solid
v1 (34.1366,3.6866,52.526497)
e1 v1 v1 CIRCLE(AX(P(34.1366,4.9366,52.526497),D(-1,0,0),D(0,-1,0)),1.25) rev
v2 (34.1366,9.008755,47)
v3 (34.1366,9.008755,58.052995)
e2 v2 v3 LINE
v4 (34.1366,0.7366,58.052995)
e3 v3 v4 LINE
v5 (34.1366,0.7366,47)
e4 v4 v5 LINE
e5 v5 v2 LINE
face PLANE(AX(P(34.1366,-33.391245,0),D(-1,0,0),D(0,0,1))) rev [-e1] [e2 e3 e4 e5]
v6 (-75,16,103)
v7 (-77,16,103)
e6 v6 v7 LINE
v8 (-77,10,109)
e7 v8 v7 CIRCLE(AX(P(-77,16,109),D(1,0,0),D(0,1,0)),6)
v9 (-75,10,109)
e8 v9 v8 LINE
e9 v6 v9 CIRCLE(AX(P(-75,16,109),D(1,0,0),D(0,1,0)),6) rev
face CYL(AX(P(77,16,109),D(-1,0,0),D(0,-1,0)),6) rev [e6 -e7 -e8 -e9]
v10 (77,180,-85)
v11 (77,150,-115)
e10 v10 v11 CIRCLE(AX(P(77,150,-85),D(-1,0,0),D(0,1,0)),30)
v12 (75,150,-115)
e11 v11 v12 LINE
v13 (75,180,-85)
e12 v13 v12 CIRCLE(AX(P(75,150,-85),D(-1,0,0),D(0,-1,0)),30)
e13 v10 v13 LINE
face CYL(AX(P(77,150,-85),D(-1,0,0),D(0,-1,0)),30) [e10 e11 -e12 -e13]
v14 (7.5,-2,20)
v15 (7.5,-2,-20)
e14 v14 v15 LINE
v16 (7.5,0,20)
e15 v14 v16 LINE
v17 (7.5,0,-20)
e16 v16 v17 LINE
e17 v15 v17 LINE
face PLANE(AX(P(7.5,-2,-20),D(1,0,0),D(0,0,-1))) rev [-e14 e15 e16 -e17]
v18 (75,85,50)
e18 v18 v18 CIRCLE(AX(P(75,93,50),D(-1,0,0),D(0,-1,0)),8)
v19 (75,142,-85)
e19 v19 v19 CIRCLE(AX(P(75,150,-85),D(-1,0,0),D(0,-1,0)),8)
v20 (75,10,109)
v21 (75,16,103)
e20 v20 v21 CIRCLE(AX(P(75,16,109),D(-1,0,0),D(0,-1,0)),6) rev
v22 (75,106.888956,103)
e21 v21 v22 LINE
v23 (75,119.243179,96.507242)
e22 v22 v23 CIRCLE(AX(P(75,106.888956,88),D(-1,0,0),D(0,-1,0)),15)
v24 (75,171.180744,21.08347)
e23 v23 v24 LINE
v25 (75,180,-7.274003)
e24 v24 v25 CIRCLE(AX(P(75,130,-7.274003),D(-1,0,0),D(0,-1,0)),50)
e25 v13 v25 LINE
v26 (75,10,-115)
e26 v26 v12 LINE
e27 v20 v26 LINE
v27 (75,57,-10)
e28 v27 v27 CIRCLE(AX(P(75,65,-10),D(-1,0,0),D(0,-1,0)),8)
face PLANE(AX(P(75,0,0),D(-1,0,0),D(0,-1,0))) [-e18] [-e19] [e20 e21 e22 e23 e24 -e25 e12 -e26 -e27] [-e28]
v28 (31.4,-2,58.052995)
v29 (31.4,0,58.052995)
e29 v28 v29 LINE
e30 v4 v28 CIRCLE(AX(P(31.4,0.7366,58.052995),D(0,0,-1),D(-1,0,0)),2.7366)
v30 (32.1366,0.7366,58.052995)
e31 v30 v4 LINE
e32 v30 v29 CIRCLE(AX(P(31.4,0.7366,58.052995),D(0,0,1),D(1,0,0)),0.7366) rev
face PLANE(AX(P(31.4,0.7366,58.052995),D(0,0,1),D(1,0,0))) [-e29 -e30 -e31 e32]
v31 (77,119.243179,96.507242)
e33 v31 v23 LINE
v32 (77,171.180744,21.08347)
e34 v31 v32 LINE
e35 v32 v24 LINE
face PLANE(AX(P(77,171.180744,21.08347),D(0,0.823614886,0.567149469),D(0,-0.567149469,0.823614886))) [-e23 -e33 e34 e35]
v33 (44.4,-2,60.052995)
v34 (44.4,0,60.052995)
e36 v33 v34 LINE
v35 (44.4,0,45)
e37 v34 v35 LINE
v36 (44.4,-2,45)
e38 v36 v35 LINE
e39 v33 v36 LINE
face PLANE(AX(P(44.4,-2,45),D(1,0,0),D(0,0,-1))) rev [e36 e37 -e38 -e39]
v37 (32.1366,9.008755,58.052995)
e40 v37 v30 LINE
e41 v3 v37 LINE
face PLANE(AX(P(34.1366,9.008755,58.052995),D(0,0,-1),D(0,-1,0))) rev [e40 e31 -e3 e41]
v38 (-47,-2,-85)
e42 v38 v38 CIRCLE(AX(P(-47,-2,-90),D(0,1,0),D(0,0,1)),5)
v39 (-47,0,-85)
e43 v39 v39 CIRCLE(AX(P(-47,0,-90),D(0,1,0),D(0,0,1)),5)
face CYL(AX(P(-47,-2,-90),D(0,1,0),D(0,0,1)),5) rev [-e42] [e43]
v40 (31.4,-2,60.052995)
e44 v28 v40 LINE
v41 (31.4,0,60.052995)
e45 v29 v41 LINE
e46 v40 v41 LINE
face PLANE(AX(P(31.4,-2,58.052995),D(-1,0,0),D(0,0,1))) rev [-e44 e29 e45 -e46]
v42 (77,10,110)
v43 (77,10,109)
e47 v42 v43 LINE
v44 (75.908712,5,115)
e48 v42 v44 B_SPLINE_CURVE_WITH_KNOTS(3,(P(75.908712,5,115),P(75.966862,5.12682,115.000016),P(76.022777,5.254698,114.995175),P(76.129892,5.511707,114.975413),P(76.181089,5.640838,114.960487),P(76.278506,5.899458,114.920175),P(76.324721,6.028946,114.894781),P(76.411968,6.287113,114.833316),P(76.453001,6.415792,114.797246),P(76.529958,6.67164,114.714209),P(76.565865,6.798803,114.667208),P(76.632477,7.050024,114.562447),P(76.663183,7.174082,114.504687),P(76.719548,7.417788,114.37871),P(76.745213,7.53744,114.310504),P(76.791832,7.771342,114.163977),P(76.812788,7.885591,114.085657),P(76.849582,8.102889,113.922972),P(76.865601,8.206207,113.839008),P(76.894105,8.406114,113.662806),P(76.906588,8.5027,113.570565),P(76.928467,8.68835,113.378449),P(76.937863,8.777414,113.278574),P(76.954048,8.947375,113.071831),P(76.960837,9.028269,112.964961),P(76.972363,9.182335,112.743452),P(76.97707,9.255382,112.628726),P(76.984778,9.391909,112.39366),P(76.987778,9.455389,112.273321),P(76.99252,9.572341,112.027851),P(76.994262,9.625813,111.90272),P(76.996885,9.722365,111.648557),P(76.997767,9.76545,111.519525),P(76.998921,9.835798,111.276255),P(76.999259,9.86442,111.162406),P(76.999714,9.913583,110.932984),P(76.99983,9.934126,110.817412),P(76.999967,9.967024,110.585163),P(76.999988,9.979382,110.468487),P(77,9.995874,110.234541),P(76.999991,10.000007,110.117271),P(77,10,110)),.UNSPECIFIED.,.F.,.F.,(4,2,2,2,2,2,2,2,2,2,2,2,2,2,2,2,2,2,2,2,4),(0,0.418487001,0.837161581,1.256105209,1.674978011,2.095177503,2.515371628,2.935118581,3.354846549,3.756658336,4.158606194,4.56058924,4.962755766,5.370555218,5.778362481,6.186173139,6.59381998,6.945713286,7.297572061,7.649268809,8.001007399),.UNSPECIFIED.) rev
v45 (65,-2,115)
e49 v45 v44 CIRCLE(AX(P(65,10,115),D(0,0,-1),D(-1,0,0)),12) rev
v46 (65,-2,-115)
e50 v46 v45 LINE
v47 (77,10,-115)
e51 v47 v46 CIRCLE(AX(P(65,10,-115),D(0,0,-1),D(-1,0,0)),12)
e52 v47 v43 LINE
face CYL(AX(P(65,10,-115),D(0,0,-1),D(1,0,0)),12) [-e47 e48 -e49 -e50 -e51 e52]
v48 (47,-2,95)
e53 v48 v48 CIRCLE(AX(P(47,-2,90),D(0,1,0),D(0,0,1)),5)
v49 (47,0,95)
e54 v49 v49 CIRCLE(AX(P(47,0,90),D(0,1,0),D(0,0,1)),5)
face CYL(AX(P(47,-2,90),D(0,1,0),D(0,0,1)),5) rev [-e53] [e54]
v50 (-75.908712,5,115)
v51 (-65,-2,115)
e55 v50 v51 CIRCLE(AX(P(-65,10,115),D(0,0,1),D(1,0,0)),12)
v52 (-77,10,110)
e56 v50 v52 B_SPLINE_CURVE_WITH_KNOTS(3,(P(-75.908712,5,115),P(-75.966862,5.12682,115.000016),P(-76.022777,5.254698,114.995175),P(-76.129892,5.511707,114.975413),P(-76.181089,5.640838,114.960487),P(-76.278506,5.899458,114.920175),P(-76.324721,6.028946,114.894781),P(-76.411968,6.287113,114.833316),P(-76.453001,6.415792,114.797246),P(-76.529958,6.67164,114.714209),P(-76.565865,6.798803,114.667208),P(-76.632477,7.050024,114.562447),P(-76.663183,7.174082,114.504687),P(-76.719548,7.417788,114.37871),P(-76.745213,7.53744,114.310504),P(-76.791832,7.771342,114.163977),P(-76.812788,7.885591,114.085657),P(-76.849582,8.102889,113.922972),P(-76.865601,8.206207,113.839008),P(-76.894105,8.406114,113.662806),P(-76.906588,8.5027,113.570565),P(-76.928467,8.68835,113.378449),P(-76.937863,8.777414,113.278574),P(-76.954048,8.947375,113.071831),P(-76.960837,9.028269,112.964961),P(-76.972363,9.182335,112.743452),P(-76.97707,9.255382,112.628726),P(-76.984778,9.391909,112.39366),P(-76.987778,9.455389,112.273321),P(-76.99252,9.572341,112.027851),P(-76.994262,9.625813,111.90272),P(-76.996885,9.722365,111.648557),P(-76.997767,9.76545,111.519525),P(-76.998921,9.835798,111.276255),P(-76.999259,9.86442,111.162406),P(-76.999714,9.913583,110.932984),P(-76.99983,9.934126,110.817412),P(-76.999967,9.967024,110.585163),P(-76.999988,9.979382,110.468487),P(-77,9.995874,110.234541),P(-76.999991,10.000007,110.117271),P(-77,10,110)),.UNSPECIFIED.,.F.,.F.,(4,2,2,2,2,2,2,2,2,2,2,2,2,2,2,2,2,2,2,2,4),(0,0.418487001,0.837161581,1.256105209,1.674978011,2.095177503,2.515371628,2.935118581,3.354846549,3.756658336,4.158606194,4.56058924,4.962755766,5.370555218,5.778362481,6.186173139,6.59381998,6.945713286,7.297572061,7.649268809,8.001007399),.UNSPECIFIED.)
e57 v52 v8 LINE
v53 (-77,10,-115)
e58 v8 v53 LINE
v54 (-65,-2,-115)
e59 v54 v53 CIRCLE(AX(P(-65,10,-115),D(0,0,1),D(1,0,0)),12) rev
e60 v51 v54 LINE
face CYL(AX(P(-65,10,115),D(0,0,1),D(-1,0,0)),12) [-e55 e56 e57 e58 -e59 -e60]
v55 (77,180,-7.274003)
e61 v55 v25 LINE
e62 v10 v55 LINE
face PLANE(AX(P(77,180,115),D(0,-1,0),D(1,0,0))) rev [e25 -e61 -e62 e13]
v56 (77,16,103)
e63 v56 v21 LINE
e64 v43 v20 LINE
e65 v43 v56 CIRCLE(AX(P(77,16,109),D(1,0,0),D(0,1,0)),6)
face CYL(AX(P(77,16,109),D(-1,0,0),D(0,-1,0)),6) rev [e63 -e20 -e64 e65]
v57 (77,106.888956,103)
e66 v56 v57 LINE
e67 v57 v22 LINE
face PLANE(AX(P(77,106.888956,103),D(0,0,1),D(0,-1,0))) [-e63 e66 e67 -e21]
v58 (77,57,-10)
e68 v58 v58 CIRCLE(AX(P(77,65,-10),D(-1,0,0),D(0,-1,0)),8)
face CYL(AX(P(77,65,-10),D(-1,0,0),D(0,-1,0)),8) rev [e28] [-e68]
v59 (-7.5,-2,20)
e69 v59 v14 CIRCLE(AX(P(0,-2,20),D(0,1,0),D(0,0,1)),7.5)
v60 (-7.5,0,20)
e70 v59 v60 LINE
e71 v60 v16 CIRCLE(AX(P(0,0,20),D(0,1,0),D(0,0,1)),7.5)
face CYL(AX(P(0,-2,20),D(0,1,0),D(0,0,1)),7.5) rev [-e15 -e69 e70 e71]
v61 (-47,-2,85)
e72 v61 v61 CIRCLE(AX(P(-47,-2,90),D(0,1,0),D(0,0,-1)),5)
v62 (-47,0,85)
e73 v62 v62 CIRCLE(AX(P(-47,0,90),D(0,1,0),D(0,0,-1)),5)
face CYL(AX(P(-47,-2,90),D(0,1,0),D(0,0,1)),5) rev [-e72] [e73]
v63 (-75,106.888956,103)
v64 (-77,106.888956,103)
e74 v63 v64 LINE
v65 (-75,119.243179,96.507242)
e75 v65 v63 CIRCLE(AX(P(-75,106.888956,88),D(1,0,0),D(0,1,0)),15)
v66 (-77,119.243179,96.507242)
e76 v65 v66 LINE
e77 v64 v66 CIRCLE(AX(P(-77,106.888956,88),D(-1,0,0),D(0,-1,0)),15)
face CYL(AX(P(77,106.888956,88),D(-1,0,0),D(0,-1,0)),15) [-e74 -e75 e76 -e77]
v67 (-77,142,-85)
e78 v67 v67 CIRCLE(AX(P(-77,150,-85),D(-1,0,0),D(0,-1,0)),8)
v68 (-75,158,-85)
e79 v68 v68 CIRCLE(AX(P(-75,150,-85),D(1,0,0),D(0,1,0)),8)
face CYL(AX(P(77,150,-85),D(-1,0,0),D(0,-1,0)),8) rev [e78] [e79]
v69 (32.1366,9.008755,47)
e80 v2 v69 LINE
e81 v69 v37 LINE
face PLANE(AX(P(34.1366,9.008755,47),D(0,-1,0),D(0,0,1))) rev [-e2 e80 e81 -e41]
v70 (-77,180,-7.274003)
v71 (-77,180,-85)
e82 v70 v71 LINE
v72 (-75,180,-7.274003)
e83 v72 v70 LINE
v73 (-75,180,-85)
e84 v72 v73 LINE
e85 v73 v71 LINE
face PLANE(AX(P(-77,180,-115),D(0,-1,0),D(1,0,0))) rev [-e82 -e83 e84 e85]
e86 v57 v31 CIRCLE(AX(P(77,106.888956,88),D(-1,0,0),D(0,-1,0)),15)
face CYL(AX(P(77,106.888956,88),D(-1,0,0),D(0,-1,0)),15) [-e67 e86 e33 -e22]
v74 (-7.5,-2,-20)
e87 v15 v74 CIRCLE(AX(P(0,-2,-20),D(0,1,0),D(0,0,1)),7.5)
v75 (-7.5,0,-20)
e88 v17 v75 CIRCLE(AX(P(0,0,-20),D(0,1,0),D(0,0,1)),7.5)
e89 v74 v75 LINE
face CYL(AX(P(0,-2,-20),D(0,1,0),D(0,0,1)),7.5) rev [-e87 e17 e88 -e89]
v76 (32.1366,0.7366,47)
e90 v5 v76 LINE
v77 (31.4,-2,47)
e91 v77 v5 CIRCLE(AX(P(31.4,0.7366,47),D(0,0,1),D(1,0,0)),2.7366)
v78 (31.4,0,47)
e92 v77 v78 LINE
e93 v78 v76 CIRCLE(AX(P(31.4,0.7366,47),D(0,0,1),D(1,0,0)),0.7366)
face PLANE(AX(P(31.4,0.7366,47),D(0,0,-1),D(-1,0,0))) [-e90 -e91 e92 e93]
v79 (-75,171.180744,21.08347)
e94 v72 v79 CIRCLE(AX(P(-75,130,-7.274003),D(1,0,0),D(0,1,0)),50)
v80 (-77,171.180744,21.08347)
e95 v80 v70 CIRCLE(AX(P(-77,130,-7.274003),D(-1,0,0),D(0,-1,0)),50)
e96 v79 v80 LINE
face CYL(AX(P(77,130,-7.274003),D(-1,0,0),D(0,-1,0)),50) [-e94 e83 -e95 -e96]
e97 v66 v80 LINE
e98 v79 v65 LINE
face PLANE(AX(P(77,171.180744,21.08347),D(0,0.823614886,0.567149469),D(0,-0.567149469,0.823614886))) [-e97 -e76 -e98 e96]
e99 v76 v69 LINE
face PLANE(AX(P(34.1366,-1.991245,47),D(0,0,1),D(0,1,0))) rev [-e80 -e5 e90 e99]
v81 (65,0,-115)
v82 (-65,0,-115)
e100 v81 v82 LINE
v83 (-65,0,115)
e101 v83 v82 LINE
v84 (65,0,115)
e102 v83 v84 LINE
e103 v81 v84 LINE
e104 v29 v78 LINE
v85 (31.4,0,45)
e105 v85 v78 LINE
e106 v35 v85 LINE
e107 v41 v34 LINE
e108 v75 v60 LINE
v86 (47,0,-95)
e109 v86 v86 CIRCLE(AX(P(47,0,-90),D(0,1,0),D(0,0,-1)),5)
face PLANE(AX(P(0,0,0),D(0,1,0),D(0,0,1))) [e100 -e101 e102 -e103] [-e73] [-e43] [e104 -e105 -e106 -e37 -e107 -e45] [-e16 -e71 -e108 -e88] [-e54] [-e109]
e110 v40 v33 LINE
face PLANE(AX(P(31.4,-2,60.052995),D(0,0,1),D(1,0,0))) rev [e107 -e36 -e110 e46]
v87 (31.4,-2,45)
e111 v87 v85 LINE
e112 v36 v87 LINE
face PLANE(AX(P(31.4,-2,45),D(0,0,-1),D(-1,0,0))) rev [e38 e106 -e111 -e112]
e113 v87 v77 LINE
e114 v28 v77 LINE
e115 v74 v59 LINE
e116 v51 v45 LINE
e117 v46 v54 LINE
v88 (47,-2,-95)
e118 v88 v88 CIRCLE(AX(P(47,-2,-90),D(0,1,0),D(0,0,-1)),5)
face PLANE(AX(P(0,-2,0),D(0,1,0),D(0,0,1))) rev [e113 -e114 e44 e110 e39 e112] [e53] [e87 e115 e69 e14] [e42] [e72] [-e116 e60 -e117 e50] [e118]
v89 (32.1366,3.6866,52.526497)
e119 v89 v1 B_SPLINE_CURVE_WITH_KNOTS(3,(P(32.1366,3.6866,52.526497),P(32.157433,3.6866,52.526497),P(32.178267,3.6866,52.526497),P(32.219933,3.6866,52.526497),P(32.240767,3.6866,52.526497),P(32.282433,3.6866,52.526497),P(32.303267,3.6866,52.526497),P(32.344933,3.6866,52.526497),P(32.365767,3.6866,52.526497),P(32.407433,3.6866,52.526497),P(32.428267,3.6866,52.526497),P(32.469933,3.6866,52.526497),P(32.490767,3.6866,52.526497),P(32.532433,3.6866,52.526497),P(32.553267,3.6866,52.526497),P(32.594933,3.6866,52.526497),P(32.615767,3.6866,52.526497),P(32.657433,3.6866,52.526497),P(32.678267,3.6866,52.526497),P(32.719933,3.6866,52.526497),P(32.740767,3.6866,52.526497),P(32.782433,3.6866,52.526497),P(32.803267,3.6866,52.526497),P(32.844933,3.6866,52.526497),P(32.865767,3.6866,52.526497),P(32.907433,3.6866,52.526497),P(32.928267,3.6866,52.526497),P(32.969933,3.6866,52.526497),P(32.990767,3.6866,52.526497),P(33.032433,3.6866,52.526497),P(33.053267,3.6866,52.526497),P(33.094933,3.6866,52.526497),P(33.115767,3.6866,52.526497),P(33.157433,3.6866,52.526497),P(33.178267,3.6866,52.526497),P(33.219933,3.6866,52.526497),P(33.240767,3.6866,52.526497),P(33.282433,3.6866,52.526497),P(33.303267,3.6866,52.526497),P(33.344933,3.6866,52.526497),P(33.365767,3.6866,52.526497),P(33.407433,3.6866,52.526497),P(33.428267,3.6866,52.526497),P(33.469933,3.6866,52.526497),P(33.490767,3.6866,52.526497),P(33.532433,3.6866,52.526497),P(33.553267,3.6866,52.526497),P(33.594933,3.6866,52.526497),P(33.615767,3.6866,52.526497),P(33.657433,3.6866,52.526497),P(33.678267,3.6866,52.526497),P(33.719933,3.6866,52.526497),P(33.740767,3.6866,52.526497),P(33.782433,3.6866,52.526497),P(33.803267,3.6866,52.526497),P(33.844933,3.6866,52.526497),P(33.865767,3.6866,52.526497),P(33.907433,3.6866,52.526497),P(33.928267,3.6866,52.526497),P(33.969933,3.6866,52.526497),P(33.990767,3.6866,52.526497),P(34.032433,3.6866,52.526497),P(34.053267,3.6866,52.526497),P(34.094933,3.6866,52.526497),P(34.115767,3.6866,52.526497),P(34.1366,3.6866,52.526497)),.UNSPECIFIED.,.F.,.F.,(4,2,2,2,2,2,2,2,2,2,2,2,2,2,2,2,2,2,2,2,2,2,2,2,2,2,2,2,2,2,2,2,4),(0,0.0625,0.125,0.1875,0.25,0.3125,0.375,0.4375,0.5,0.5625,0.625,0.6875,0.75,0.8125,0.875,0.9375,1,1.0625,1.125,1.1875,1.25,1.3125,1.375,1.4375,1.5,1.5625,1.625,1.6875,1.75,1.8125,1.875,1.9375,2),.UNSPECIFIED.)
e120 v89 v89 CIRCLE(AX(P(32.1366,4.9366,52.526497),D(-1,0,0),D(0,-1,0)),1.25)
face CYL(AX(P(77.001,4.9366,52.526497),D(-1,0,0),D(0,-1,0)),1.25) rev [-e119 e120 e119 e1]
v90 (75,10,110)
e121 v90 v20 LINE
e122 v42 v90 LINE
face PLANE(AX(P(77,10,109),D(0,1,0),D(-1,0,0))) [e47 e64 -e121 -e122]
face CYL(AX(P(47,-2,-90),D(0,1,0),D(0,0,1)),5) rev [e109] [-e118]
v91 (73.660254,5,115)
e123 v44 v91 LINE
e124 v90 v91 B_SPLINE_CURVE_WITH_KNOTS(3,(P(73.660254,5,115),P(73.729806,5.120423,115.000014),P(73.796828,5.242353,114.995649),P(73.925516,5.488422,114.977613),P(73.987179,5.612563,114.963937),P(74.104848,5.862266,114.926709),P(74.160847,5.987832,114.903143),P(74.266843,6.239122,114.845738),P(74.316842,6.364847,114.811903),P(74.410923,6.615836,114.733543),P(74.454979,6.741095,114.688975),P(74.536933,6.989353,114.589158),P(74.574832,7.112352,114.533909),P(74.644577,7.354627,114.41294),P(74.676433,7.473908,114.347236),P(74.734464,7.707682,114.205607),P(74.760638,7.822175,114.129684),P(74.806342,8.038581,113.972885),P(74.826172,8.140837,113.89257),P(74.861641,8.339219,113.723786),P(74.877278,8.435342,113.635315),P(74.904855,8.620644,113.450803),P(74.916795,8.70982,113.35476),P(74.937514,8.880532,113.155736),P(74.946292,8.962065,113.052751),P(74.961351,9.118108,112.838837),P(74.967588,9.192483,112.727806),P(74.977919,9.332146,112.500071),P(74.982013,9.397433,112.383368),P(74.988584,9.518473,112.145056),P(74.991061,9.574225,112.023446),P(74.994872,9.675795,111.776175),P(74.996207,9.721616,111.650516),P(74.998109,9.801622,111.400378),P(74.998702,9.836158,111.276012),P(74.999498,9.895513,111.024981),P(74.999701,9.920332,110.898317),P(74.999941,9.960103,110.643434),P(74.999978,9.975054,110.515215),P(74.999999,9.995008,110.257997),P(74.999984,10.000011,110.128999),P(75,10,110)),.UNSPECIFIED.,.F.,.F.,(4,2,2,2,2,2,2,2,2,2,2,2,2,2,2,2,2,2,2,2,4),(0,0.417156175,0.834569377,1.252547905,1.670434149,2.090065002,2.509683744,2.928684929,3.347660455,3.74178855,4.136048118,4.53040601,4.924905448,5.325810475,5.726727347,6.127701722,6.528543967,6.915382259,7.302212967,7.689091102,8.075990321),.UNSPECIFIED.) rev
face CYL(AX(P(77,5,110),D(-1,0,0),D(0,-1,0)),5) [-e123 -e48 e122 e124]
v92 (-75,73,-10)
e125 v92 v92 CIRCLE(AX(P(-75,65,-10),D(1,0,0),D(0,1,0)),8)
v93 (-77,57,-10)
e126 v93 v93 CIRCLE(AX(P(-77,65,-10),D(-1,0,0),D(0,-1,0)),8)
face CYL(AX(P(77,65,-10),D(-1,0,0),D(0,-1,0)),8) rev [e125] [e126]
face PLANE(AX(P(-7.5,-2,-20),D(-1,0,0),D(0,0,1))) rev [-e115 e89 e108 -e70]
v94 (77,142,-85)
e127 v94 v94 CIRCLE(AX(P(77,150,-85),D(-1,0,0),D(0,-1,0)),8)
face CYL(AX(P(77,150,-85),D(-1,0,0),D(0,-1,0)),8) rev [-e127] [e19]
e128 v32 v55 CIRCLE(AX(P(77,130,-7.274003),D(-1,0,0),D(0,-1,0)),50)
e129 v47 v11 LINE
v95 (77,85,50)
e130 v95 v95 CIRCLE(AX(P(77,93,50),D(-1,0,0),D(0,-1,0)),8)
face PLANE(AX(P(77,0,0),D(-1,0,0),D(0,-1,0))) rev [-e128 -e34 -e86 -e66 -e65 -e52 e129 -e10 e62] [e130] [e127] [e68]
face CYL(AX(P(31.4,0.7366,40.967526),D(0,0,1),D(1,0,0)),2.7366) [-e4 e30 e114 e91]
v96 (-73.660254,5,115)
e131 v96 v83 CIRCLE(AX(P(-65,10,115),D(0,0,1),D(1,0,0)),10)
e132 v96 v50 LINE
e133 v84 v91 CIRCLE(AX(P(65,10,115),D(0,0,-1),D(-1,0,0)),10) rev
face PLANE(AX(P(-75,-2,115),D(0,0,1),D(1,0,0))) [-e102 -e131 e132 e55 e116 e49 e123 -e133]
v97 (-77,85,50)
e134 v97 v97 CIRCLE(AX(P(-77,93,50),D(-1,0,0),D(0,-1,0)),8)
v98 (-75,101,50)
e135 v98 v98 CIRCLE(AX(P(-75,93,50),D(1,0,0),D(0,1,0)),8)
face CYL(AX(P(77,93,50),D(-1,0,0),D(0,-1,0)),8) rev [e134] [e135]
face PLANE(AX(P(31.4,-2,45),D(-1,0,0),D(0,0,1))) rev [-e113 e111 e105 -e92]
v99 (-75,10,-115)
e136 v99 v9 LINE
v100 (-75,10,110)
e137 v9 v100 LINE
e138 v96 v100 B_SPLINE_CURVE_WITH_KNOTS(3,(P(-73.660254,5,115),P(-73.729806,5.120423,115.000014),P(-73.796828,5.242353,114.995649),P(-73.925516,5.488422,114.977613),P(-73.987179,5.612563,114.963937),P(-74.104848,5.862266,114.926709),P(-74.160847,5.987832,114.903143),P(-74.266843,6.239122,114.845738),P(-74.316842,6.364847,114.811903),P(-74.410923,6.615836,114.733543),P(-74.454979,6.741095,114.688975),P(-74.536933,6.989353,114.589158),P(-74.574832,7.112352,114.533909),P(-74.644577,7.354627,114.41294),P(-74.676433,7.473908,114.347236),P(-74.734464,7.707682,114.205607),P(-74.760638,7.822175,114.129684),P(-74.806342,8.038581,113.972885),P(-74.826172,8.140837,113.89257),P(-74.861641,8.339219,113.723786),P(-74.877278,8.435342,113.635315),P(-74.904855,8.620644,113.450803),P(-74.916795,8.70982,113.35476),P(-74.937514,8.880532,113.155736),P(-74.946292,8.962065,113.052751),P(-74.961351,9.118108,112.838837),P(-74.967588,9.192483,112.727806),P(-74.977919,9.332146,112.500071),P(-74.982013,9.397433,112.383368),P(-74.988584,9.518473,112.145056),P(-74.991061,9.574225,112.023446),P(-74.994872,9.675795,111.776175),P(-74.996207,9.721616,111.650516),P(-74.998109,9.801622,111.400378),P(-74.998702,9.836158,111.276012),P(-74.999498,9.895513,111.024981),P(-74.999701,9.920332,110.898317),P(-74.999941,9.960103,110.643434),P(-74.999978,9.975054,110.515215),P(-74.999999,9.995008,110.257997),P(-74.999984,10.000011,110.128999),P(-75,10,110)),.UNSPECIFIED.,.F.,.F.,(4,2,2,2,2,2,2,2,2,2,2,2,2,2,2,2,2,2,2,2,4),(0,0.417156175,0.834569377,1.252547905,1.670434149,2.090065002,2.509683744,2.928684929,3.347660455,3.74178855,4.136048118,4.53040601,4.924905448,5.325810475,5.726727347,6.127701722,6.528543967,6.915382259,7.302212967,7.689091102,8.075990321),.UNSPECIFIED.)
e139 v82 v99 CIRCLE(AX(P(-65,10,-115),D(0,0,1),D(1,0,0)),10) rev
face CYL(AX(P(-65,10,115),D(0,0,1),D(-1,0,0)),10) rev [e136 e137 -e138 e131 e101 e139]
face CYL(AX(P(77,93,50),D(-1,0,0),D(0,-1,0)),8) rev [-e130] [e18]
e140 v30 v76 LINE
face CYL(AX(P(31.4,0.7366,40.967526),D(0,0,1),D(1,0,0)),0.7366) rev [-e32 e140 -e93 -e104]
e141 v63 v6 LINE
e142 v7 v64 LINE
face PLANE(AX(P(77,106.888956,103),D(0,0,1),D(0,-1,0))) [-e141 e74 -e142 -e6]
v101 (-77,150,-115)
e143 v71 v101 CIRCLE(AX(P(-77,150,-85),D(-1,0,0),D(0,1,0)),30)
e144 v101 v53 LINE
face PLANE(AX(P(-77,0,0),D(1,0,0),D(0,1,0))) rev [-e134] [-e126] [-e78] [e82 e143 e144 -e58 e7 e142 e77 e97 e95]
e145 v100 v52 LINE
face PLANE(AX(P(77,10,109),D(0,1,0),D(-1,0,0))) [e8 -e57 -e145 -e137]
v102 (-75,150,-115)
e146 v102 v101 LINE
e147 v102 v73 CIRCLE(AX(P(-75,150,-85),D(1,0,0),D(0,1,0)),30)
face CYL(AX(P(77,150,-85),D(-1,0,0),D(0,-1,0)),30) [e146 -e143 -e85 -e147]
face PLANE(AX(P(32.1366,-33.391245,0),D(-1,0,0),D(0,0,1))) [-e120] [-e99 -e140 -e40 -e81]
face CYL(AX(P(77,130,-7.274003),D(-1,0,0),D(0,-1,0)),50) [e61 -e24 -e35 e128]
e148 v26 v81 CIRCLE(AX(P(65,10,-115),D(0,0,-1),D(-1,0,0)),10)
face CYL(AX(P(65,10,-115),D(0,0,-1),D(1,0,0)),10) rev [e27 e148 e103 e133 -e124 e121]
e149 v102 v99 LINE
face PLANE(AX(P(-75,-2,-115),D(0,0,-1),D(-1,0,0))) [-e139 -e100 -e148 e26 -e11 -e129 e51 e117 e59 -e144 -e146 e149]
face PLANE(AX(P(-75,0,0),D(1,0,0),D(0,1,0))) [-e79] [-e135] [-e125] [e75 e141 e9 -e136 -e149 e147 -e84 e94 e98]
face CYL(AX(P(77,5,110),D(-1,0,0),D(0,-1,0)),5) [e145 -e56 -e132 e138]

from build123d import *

# Parameters (mm, degrees)
SKETCH1_W                      = 150
SKETCH1_H                      = 230
BASE_FLANGE1_DEPTH             = 2
EDGE_FLANGE1_STRIP_W           = 28
EDGE_FLANGE1_STRIP_H           = 2
EDGE_FLANGE1_STRIP_CUT_DEPTH   = 230
EDGE_FLANGE1_STRIP_2_W         = 28
EDGE_FLANGE1_STRIP_2_H         = 2
EDGE_FLANGE1_STRIP_CUT_2_DEPTH = 230
EDGE_FLANGE1_DEPTH             = 230
EDGE_FLANGE1_BEND_DEPTH        = 230
SKETCH15_OUTSIDE_W             = 298.254
SKETCH15_OUTSIDE_H             = 250.254
SKETCH15_OUTSIDE_R             = 8
CUT_EXTRUDE1_DEPTH             = 264.326793168
SKETCH16_R                     = 5
CUT_EXTRUDE2_DEPTH             = 228.055059487
CUT_EXTRUDE3_DEPTH             = 228.055059487
SKETCHED_START                 = 47
SKETCHED_BEND1_DEPTH           = 11.052994728
SKETCHED_BEND1_2_DEPTH         = 11.052994728
CUT_EXTRUDE4_REACH             = 241.866
SKETCH20_R                     = 1.25


# Read off the part's stored shape, not the designer's step: Sketched Bend1
# Sheet-metal steps are written as plain solids
with BuildPart() as part:
    # Sketch1 → Base-Flange1 (new body)
    with BuildSketch(Plane(origin=(0, 0, 0), x_dir=(1, 0, 0), z_dir=(0, 1, 0))):
        Rectangle(SKETCH1_W, SKETCH1_H)
    extrude(amount=-BASE_FLANGE1_DEPTH)

    # Edge-Flange1 strip (across the edge) → Edge-Flange1 strip cut (cut)
    with BuildSketch(Plane(origin=(75, 0, 115), x_dir=(-1, 0, 0), z_dir=(0, 0, -1))):
        with Locations((-4, -1)):
            Rectangle(EDGE_FLANGE1_STRIP_W, EDGE_FLANGE1_STRIP_H)
    extrude(amount=EDGE_FLANGE1_STRIP_CUT_DEPTH, mode=Mode.SUBTRACT)

    # Edge-Flange1 strip 2 (across the edge) → Edge-Flange1 strip cut 2 (cut)
    with BuildSketch(Plane(origin=(-75, 0, -115), x_dir=(1, 0, 0), z_dir=(0, 0, 1))):
        with Locations((-4, -1)):
            Rectangle(EDGE_FLANGE1_STRIP_2_W, EDGE_FLANGE1_STRIP_2_H)
    extrude(amount=EDGE_FLANGE1_STRIP_CUT_2_DEPTH, mode=Mode.SUBTRACT)

    # Edge-Flange1 section (across the edge) → Edge-Flange1 (add)
    with BuildSketch(Plane(origin=(75, 0, 115), x_dir=(-1, 0, 0), z_dir=(0, 0, -1))):
        with BuildLine():
            Line((-2, 10), (-2, 180))
            Line((-2, 180), (0, 180))
            Line((0, 180), (0, 10))
            ThreePointArc((0, 10), (2.928932188, 2.928932188), (10, 0))
            Line((10, 0), (10, -2))
            ThreePointArc((10, -2), (1.514718626, 1.514718626), (-2, 10))
        make_face()
    extrude(amount=EDGE_FLANGE1_DEPTH)

    # Edge-Flange1 section 2 (across the edge) → Edge-Flange1 bend (add)
    with BuildSketch(Plane(origin=(-75, 0, -115), x_dir=(1, 0, 0), z_dir=(0, 0, 1))):
        with BuildLine():
            Line((-2, 10), (-2, 180))
            Line((-2, 180), (0, 180))
            Line((0, 180), (0, 10))
            ThreePointArc((0, 10), (2.928932188, 2.928932188), (10, 0))
            Line((10, 0), (10, -2))
            ThreePointArc((10, -2), (1.514718626, 1.514718626), (-2, 10))
        make_face()
    extrude(amount=EDGE_FLANGE1_BEND_DEPTH)

    # Sketch15 outside → Cut-Extrude1 (cut, through all)
    # profile 1 of 4: a face of its own
    with BuildSketch(Plane.ZY.offset(77)):
        with Locations((0, 89)):
            Rectangle(SKETCH15_OUTSIDE_W, SKETCH15_OUTSIDE_H)
        with BuildLine():
            Line((21.083470393, 171.180744276), (96.507242037, 119.243178795))
            ThreePointArc((96.507242037, 119.243178795), (101.277963521, 113.867184852), (103, 106.888955512))
            Line((103, 106.888955512), (103, 16))
            ThreePointArc((103, 16), (104.757359313, 11.757359313), (109, 10))
            Line((109, 10), (110, 10))
            ThreePointArc((110, 10), (113.535533906, 8.535533906), (115, 5))
            Line((115, 5), (115, -2))
            Line((115, -2), (-115, -2))
            Line((-115, -2), (-115, 99))
            Line((-115, 99), (-115, 150))
            ThreePointArc((-115, 150), (-106.213203436, 171.213203436), (-85, 180))
            Line((-85, 180), (-49, 180))
            Line((-49, 180), (-7.274003064, 180))
            ThreePointArc((-7.274003064, 180), (7.574612801, 177.744304445), (21.083470393, 171.180744276))
        make_face(mode=Mode.SUBTRACT)
    # profile 2 of 4: a face of its own
    with BuildSketch(Plane.ZY.offset(77)):
        with Locations(Location((50, 93, 0), (0, 0, 270))):
            Circle(SKETCH15_OUTSIDE_R)
    # profile 3 of 4: a face of its own
    with BuildSketch(Plane.ZY.offset(77)):
        with Locations(Location((-85, 150, 0), (0, 0, 270))):
            Circle(SKETCH15_OUTSIDE_R)
    # profile 4 of 4: a face of its own
    with BuildSketch(Plane.ZY.offset(77)):
        with Locations(Location((-10, 65, 0), (0, 0, 270))):
            Circle(SKETCH15_OUTSIDE_R)
    extrude(amount=-CUT_EXTRUDE1_DEPTH, mode=Mode.SUBTRACT)

    # Sketch16 → Cut-Extrude2 (cut, through all)
    with BuildSketch(Plane(origin=(0, 0, 0), x_dir=(1, 0, 0), z_dir=(0, 1, 0))):
        with Locations(Location((-47, 90, 0), (0, 0, 270))):
            Circle(SKETCH16_R)
        with Locations(Location((47, 90, 0), (0, 0, 90))):
            Circle(SKETCH16_R)
        with Locations(Location((47, -90, 0), (0, 0, 270))):
            Circle(SKETCH16_R)
        with Locations(Location((-47, -90, 0), (0, 0, 90))):
            Circle(SKETCH16_R)
        with BuildLine():
            Line((7.5, 20), (7.5, -20))
            ThreePointArc((7.5, -20), (0, -27.5), (-7.5, -20))
            Line((-7.5, -20), (-7.5, 20))
            ThreePointArc((-7.5, 20), (0, 27.5), (7.5, 20))
        make_face()
    extrude(amount=-CUT_EXTRUDE2_DEPTH, mode=Mode.SUBTRACT)

    # Sketch18 → Cut-Extrude3 (cut, through all)
    with BuildSketch(Plane(origin=(0, 0, 0), x_dir=(1, 0, 0), z_dir=(0, 1, 0))):
        Polygon((31.4, -45), (44.4, -45), (44.4, -60.052994728), (31.4, -60.052994728), (31.4, -58.052994728), (42.4, -58.052994728), (42.4, -47), (31.4, -47), align=None)
    extrude(amount=-CUT_EXTRUDE3_DEPTH, mode=Mode.SUBTRACT)

    # Sketched Bend1 outline → Sketched Bend1 (cut)
    with BuildSketch(Plane.XY.offset(SKETCHED_START)):
        with BuildLine():
            ThreePointArc((34.035602398, 0), (33.054267209, -1.443395312), (31.4, -2))
            Line((31.4, -2), (42.4, -2))
            Line((42.4, -2), (42.4, 0))
            Line((42.4, 0), (34.035602398, 0))
        make_face()
    extrude(amount=SKETCHED_BEND1_DEPTH, mode=Mode.SUBTRACT)

    # Sketched Bend1 2 outline → Sketched Bend1 2 (add)
    with BuildSketch(Plane.XY.offset(SKETCHED_START)):
        with BuildLine():
            Line((31.4, 0), (34.035602398, 0))
            ThreePointArc((34.035602398, 0), (34.111233029, 0.364854094), (34.1366, 0.7366))
            Line((34.1366, 0.7366), (34.1366, 9.008755099))
            Line((34.1366, 9.008755099), (32.1366, 9.008755099))
            Line((32.1366, 9.008755099), (32.1366, 0.7366))
            ThreePointArc((32.1366, 0.7366), (31.920854855, 0.215745145), (31.4, 0))
        make_face()
    extrude(amount=SKETCHED_BEND1_2_DEPTH)

    # Sketch20 → Cut-Extrude4 (cut, up to next)
    with BuildSketch(Plane.ZY.offset(-32.1366), mode=Mode.PRIVATE) as cut_extrude4_sk1:
        with Locations(Location((52.526497364, 4.9366, 0), (0, 0, 270))):
            Circle(SKETCH20_R)
    cut_extrude4_tool1 = extrude(cut_extrude4_sk1.sketch, amount=-CUT_EXTRUDE4_REACH, mode=Mode.PRIVATE) & part.part
    add(cut_extrude4_tool1.solids().sort_by_distance((32.1366, 4.9366, 52.526497))[0], mode=Mode.SUBTRACT)


solid = part.part
